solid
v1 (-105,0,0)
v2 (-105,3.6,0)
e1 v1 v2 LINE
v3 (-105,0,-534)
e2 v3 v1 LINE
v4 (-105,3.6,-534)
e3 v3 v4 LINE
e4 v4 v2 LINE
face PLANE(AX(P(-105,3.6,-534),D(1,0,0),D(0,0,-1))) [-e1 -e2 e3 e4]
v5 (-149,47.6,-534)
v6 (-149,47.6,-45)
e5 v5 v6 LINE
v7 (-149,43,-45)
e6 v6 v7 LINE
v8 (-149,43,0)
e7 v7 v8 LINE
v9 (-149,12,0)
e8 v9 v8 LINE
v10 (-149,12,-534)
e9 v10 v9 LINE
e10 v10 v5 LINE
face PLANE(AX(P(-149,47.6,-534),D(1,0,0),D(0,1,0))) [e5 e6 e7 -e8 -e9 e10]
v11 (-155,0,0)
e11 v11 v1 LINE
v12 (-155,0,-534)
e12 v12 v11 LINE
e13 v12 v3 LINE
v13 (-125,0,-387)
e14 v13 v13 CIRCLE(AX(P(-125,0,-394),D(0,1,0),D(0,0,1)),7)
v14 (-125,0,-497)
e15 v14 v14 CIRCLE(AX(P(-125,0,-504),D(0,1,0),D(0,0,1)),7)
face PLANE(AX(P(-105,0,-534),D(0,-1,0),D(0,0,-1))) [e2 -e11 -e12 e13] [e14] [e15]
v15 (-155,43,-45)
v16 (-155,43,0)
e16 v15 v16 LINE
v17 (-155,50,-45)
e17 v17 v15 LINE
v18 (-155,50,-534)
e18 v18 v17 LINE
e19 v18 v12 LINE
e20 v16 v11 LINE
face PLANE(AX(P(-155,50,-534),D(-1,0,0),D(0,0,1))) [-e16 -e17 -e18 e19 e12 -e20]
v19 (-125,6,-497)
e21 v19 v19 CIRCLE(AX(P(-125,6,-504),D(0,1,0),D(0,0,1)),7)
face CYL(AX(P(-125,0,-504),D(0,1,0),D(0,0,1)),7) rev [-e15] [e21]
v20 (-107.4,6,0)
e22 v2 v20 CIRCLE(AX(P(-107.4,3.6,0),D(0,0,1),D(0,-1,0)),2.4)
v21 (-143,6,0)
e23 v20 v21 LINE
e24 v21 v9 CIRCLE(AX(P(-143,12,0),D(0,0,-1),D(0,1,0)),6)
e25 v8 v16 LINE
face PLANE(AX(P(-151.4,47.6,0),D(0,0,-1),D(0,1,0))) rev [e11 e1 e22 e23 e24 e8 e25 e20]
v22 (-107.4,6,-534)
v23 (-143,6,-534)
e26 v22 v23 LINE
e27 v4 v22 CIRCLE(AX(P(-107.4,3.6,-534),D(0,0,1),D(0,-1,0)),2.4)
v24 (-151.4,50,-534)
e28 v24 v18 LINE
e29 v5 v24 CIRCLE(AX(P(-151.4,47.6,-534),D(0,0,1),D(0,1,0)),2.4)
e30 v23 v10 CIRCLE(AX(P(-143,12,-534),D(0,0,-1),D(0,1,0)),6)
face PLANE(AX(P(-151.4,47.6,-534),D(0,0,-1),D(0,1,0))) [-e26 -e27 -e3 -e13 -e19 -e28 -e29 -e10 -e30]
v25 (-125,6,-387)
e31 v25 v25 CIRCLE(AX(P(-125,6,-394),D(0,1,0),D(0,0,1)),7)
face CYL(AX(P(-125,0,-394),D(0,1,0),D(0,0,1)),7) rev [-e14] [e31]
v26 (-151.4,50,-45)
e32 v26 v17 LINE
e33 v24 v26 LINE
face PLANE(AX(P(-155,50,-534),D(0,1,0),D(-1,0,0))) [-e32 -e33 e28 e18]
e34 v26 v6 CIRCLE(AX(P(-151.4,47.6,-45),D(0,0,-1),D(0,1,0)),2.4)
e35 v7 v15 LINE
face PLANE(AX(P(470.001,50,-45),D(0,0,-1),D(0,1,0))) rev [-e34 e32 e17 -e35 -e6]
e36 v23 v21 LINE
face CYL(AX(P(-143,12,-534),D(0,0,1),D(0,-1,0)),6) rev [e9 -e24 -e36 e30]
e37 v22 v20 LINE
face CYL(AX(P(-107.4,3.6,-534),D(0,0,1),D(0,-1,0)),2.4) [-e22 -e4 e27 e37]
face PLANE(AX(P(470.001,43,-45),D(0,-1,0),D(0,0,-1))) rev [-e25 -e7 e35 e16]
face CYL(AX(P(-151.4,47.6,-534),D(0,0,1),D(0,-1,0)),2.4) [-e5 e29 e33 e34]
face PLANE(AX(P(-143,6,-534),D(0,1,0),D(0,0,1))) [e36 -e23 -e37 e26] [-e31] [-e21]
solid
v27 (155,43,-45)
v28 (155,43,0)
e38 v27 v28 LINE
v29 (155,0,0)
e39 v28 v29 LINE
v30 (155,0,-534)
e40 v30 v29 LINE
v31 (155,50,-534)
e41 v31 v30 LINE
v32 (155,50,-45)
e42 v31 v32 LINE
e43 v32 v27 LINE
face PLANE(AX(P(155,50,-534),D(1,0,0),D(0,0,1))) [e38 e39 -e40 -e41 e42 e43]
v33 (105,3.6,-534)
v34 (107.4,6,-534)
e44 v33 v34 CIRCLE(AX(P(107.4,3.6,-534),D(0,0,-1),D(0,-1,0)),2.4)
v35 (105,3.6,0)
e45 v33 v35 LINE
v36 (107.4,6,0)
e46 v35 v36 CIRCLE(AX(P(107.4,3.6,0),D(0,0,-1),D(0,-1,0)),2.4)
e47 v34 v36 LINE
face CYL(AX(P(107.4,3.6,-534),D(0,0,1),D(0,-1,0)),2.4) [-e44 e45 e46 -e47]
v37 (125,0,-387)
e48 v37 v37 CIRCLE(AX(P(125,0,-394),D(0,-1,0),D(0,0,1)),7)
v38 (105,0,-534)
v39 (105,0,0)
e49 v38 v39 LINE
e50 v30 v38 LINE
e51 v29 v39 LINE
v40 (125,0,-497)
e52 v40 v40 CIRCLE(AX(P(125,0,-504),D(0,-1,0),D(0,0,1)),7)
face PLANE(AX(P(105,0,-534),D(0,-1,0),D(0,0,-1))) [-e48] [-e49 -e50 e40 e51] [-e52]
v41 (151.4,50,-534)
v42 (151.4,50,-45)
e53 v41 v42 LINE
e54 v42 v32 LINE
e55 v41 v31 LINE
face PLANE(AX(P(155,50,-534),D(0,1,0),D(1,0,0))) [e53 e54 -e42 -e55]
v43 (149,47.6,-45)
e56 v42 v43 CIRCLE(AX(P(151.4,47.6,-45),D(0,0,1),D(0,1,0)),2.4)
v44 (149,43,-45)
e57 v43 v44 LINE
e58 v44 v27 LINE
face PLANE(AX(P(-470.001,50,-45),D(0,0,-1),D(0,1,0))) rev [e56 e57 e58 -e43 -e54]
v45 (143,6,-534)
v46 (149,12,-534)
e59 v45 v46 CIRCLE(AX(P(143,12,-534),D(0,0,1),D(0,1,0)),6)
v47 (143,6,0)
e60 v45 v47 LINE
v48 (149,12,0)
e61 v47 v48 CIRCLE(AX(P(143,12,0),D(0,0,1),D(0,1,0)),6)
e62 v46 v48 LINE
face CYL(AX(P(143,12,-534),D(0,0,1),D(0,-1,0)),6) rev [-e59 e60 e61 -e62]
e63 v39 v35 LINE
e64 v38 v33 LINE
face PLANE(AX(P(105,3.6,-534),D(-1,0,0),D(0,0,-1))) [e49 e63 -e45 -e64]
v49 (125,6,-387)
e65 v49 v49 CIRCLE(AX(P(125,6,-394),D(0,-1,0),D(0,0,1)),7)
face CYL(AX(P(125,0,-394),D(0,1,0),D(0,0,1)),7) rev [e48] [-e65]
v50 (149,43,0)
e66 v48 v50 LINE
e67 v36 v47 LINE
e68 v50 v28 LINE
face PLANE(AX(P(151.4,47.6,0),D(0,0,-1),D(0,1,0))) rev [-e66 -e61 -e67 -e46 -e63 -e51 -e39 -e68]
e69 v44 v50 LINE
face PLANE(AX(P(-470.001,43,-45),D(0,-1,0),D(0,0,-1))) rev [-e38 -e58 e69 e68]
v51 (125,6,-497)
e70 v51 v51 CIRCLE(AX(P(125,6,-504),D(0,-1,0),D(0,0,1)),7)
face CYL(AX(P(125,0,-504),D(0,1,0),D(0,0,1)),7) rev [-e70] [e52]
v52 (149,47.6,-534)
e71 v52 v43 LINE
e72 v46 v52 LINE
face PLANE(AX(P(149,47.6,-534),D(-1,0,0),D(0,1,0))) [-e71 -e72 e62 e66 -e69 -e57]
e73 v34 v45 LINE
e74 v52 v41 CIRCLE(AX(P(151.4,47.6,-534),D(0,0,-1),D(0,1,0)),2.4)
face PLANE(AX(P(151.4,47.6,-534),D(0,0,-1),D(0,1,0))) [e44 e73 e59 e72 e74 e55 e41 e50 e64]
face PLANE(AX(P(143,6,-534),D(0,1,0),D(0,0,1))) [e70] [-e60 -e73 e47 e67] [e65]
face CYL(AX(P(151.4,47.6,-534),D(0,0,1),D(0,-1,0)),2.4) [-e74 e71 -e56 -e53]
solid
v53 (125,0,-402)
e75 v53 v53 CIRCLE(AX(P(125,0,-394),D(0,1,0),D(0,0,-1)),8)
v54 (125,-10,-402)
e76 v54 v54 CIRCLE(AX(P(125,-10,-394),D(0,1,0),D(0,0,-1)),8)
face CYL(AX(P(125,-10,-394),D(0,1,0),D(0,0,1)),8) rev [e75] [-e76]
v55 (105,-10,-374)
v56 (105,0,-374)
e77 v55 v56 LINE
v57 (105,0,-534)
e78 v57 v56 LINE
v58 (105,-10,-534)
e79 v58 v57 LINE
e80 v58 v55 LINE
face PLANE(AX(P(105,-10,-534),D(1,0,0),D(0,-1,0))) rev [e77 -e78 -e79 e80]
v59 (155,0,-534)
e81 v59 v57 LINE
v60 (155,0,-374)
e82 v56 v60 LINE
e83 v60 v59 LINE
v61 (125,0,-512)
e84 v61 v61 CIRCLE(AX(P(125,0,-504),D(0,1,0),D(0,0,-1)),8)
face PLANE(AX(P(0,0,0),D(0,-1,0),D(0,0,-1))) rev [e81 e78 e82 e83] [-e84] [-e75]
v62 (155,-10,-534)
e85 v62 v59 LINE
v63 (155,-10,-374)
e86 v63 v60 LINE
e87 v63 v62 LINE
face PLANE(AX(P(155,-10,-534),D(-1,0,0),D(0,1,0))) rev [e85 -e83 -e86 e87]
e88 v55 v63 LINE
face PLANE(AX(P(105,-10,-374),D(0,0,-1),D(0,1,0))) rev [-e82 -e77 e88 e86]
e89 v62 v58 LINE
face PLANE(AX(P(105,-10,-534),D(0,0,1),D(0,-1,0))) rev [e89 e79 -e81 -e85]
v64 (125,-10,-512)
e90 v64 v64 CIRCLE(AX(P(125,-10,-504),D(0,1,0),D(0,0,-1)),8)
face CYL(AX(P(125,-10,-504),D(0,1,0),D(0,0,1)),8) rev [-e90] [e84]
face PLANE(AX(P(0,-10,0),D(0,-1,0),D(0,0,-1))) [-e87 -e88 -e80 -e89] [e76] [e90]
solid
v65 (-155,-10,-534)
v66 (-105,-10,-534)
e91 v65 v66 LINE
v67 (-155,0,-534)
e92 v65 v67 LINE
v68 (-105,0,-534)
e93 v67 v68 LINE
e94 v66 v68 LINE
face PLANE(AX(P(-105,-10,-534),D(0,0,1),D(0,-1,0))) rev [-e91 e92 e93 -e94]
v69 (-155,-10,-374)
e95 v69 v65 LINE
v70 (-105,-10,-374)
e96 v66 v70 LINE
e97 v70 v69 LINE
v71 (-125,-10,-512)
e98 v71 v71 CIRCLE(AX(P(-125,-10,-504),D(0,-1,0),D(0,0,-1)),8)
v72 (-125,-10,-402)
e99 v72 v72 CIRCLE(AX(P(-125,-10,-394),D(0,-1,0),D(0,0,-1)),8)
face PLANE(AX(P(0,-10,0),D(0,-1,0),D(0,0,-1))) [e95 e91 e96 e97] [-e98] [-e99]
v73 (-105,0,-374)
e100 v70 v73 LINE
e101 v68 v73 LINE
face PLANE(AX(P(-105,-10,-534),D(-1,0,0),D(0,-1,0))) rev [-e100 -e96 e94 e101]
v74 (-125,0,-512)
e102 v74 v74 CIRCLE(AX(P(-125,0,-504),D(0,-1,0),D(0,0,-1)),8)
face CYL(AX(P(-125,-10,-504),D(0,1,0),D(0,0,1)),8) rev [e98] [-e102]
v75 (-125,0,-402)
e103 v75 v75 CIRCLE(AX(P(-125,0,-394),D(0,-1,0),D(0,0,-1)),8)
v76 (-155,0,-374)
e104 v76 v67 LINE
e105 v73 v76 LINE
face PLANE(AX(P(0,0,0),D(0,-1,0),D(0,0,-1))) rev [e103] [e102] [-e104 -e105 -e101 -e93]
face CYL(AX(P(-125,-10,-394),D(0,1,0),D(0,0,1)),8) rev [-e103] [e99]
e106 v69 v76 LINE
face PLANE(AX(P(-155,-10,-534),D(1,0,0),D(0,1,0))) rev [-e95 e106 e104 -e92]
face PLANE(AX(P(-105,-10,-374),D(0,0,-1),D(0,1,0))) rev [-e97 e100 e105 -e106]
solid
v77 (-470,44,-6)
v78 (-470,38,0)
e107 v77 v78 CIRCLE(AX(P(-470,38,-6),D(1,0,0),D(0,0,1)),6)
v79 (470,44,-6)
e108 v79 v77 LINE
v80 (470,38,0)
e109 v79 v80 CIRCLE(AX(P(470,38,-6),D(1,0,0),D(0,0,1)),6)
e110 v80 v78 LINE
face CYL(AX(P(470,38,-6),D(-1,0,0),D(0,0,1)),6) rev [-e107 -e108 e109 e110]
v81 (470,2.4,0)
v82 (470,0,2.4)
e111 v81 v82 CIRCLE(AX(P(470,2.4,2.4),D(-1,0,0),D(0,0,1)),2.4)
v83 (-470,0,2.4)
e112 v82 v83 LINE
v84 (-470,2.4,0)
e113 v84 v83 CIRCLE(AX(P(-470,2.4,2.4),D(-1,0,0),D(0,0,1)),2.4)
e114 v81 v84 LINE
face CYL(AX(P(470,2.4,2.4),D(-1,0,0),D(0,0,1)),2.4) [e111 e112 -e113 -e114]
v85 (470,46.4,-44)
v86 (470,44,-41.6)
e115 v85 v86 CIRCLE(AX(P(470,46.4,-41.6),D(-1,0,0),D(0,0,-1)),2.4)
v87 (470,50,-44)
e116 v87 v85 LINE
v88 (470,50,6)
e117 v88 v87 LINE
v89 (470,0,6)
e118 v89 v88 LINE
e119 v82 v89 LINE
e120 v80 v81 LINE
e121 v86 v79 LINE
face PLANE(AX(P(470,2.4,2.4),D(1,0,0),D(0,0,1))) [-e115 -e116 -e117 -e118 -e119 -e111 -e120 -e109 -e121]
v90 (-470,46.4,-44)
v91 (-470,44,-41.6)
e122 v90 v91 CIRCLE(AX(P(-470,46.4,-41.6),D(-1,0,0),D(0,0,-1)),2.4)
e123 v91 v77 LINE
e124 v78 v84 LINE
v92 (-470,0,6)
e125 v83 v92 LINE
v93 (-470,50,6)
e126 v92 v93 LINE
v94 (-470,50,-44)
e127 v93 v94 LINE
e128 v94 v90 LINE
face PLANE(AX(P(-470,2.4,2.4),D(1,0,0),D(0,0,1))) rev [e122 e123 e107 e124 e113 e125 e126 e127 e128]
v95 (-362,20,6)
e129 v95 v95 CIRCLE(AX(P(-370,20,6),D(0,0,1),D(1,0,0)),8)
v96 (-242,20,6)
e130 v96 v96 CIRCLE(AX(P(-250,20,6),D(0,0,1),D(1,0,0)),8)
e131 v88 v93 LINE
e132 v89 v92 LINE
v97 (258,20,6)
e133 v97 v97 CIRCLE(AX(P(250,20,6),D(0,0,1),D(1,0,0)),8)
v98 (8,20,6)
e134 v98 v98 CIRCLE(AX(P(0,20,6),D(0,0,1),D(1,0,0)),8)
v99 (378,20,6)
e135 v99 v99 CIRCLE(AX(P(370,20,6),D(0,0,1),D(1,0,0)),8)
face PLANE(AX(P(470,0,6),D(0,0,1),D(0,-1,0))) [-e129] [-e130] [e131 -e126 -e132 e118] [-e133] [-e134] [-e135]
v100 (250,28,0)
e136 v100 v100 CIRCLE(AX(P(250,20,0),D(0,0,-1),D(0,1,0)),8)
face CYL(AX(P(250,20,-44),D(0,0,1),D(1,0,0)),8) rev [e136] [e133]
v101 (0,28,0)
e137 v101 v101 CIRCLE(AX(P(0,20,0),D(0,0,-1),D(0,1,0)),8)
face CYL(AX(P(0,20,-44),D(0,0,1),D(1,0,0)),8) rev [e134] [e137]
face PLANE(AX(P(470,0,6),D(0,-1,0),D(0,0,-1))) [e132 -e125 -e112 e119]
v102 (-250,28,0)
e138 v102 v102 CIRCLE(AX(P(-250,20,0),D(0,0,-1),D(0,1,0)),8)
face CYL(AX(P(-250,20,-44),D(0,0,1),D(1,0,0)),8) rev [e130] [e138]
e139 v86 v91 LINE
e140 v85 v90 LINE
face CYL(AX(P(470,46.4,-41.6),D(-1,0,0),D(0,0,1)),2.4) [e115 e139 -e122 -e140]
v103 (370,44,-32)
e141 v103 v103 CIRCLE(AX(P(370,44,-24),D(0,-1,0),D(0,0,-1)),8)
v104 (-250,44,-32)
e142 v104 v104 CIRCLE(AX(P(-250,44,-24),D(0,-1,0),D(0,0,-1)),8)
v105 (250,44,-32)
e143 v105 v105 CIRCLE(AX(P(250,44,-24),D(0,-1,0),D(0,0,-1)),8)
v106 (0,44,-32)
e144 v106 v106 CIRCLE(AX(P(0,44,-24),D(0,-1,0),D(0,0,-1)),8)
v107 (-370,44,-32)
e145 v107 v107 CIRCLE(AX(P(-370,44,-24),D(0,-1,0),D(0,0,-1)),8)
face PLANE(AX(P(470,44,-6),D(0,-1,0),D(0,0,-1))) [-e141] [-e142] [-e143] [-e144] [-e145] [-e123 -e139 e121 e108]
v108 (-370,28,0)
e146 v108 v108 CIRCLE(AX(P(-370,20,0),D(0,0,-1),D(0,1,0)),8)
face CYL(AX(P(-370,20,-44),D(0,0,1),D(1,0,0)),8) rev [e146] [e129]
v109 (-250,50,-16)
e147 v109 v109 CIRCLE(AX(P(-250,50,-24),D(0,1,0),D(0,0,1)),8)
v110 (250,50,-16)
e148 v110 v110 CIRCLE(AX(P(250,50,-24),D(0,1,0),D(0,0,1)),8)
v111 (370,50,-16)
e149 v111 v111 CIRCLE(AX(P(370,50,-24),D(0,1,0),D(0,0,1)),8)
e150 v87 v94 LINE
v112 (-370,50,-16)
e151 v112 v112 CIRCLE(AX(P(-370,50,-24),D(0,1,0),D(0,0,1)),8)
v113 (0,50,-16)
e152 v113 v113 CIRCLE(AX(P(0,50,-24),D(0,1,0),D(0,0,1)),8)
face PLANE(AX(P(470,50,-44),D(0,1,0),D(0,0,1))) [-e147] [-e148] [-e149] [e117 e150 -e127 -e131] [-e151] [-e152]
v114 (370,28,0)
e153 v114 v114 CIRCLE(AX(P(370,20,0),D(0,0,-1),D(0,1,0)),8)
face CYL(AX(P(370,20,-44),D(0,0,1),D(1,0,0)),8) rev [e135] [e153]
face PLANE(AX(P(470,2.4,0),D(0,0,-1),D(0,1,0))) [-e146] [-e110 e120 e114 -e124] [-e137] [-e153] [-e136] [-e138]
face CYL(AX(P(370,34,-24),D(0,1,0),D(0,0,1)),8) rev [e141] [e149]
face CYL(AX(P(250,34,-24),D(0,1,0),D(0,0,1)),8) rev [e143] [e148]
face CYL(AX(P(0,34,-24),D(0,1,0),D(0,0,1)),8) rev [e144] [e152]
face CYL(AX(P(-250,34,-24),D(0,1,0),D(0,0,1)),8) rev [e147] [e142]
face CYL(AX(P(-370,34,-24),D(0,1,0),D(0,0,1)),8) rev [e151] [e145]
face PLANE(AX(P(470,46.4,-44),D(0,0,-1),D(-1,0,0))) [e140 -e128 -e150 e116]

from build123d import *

# Parameters (mm, degrees)
STRUCTURAL_MEMBER1_DEPTH = 940
HOLE1_START              = 44
HOLE1_OUTLINE_R          = 8
HOLE1_DEPTH              = 6
SKETCH17_R               = 8
CUT_EXTRUDE2_DEPTH       = 476.289385533
STRUCTURAL_MEMBER2_DEPTH = 534
SKETCH16_R               = 7
MOUNTING_HOLES_DEPTH     = 713.735575091
SKETCH112_W              = 45
SKETCH112_H              = 7
CUT_EXTRUDE3_DEPTH       = 6
SKETCH118_W              = 50
SKETCH118_H              = 160
SKETCH118_R              = 8
BOSS_EXTRUDE1_DEPTH      = 10


# Read off the part's stored shape, not the designer's step: Hole1
with BuildPart() as part:
    # Sketch12 → Structural Member1 (new body)
    with BuildSketch(Plane(origin=(-470, 50, 6), x_dir=(0, 0, -1), z_dir=(-1, 0, 0))):
        with BuildLine():
            Line((0, 50), (0, 0))
            Line((0, 0), (50, 0))
            Line((50, 0), (50, 3.6))
            ThreePointArc((50, 3.6), (49.297056275, 5.297056275), (47.6, 6))
            Line((47.6, 6), (12, 6))
            ThreePointArc((12, 6), (7.757359313, 7.757359313), (6, 12))
            Line((6, 12), (6, 47.6))
            ThreePointArc((6, 47.6), (5.297056275, 49.297056275), (3.6, 50))
            Line((3.6, 50), (0, 50))
        make_face()
    extrude(amount=-STRUCTURAL_MEMBER1_DEPTH)

    # Hole1 outline → Hole1 (cut)
    with BuildSketch(Plane(origin=(0, 0, 0), x_dir=(1, 0, 0), z_dir=(0, 1, 0)).offset(HOLE1_START)):
        with Locations((-250, 24)):
            Circle(HOLE1_OUTLINE_R)
        with Locations((0, 24)):
            Circle(HOLE1_OUTLINE_R)
        with Locations((-370, 24)):
            Circle(HOLE1_OUTLINE_R)
        with Locations((370, 24)):
            Circle(HOLE1_OUTLINE_R)
        with Locations((250, 24)):
            Circle(HOLE1_OUTLINE_R)
    extrude(amount=HOLE1_DEPTH, mode=Mode.SUBTRACT)

    # Sketch17 → Cut-Extrude2 (cut, through all)
    with BuildSketch(Plane.XY.offset(6)):
        with Locations((250, 20)):
            Circle(SKETCH17_R)
        with Locations((370, 20)):
            Circle(SKETCH17_R)
        with Locations((0, 20)):
            Circle(SKETCH17_R)
        with Locations((-370, 20)):
            Circle(SKETCH17_R)
        with Locations((-250, 20)):
            Circle(SKETCH17_R)
    extrude(amount=-CUT_EXTRUDE2_DEPTH, mode=Mode.SUBTRACT)


with BuildPart() as body_2:
    # Sketch111 → Structural Member2 (new body)
    with BuildSketch(Plane(origin=(-155, 0, 0), x_dir=(1, 0, 0), z_dir=(0, 0, 1))):
        with BuildLine():
            Line((0, 50), (0, 0))
            Line((0, 0), (50, 0))
            Line((50, 0), (50, 3.6))
            ThreePointArc((50, 3.6), (49.297056275, 5.297056275), (47.6, 6))
            Line((47.6, 6), (12, 6))
            ThreePointArc((12, 6), (7.757359313, 7.757359313), (6, 12))
            Line((6, 12), (6, 47.6))
            ThreePointArc((6, 47.6), (5.297056275, 49.297056275), (3.6, 50))
            Line((3.6, 50), (0, 50))
        make_face()
    extrude(amount=-STRUCTURAL_MEMBER2_DEPTH)

    # Sketch16 → Mounting Holes (cut, through all)
    with BuildSketch(Plane(origin=(0, 6, 0), x_dir=(1, 0, 0), z_dir=(0, 1, 0))):
        with Locations(Location((-125, 504, 0), (0, 0, 270))):
            Circle(SKETCH16_R)
        with Locations(Location((-125, 394, 0), (0, 0, 270))):
            Circle(SKETCH16_R)
    extrude(amount=-MOUNTING_HOLES_DEPTH, mode=Mode.SUBTRACT)

    # Sketch112 → Cut-Extrude3 (cut)
    with BuildSketch(Plane.ZY.offset(155)):
        with Locations((-22.5, 46.5)):
            Rectangle(SKETCH112_W, SKETCH112_H)
    extrude(amount=-CUT_EXTRUDE3_DEPTH, mode=Mode.SUBTRACT)


with BuildPart() as body_3:
    # Mirror2: mirrored copy
    add(body_2.part.mirror(Plane(origin=(0, 0, 0), x_dir=(0, 0, 1), z_dir=(1, 0, 0))))


with BuildPart() as body_4:
    # Sketch118 → Boss-Extrude1 (new body)
    with BuildSketch(Plane.XZ):
        with Locations((-130, -454)):
            Rectangle(SKETCH118_W, SKETCH118_H)
        with Locations(Location((-125, -394, 0), (0, 0, 270))):
            Circle(SKETCH118_R, mode=Mode.SUBTRACT)
        with Locations(Location((-125, -504, 0), (0, 0, 270))):
            Circle(SKETCH118_R, mode=Mode.SUBTRACT)
    extrude(amount=BOSS_EXTRUDE1_DEPTH)


with BuildPart() as body_5:
    # Mirror5: mirrored copy
    add(body_4.part.mirror(Plane(origin=(0, 0, 0), x_dir=(0, 0, 1), z_dir=(1, 0, 0))))


solid = Compound([part.part, body_2.part, body_3.part, body_4.part, body_5.part])
